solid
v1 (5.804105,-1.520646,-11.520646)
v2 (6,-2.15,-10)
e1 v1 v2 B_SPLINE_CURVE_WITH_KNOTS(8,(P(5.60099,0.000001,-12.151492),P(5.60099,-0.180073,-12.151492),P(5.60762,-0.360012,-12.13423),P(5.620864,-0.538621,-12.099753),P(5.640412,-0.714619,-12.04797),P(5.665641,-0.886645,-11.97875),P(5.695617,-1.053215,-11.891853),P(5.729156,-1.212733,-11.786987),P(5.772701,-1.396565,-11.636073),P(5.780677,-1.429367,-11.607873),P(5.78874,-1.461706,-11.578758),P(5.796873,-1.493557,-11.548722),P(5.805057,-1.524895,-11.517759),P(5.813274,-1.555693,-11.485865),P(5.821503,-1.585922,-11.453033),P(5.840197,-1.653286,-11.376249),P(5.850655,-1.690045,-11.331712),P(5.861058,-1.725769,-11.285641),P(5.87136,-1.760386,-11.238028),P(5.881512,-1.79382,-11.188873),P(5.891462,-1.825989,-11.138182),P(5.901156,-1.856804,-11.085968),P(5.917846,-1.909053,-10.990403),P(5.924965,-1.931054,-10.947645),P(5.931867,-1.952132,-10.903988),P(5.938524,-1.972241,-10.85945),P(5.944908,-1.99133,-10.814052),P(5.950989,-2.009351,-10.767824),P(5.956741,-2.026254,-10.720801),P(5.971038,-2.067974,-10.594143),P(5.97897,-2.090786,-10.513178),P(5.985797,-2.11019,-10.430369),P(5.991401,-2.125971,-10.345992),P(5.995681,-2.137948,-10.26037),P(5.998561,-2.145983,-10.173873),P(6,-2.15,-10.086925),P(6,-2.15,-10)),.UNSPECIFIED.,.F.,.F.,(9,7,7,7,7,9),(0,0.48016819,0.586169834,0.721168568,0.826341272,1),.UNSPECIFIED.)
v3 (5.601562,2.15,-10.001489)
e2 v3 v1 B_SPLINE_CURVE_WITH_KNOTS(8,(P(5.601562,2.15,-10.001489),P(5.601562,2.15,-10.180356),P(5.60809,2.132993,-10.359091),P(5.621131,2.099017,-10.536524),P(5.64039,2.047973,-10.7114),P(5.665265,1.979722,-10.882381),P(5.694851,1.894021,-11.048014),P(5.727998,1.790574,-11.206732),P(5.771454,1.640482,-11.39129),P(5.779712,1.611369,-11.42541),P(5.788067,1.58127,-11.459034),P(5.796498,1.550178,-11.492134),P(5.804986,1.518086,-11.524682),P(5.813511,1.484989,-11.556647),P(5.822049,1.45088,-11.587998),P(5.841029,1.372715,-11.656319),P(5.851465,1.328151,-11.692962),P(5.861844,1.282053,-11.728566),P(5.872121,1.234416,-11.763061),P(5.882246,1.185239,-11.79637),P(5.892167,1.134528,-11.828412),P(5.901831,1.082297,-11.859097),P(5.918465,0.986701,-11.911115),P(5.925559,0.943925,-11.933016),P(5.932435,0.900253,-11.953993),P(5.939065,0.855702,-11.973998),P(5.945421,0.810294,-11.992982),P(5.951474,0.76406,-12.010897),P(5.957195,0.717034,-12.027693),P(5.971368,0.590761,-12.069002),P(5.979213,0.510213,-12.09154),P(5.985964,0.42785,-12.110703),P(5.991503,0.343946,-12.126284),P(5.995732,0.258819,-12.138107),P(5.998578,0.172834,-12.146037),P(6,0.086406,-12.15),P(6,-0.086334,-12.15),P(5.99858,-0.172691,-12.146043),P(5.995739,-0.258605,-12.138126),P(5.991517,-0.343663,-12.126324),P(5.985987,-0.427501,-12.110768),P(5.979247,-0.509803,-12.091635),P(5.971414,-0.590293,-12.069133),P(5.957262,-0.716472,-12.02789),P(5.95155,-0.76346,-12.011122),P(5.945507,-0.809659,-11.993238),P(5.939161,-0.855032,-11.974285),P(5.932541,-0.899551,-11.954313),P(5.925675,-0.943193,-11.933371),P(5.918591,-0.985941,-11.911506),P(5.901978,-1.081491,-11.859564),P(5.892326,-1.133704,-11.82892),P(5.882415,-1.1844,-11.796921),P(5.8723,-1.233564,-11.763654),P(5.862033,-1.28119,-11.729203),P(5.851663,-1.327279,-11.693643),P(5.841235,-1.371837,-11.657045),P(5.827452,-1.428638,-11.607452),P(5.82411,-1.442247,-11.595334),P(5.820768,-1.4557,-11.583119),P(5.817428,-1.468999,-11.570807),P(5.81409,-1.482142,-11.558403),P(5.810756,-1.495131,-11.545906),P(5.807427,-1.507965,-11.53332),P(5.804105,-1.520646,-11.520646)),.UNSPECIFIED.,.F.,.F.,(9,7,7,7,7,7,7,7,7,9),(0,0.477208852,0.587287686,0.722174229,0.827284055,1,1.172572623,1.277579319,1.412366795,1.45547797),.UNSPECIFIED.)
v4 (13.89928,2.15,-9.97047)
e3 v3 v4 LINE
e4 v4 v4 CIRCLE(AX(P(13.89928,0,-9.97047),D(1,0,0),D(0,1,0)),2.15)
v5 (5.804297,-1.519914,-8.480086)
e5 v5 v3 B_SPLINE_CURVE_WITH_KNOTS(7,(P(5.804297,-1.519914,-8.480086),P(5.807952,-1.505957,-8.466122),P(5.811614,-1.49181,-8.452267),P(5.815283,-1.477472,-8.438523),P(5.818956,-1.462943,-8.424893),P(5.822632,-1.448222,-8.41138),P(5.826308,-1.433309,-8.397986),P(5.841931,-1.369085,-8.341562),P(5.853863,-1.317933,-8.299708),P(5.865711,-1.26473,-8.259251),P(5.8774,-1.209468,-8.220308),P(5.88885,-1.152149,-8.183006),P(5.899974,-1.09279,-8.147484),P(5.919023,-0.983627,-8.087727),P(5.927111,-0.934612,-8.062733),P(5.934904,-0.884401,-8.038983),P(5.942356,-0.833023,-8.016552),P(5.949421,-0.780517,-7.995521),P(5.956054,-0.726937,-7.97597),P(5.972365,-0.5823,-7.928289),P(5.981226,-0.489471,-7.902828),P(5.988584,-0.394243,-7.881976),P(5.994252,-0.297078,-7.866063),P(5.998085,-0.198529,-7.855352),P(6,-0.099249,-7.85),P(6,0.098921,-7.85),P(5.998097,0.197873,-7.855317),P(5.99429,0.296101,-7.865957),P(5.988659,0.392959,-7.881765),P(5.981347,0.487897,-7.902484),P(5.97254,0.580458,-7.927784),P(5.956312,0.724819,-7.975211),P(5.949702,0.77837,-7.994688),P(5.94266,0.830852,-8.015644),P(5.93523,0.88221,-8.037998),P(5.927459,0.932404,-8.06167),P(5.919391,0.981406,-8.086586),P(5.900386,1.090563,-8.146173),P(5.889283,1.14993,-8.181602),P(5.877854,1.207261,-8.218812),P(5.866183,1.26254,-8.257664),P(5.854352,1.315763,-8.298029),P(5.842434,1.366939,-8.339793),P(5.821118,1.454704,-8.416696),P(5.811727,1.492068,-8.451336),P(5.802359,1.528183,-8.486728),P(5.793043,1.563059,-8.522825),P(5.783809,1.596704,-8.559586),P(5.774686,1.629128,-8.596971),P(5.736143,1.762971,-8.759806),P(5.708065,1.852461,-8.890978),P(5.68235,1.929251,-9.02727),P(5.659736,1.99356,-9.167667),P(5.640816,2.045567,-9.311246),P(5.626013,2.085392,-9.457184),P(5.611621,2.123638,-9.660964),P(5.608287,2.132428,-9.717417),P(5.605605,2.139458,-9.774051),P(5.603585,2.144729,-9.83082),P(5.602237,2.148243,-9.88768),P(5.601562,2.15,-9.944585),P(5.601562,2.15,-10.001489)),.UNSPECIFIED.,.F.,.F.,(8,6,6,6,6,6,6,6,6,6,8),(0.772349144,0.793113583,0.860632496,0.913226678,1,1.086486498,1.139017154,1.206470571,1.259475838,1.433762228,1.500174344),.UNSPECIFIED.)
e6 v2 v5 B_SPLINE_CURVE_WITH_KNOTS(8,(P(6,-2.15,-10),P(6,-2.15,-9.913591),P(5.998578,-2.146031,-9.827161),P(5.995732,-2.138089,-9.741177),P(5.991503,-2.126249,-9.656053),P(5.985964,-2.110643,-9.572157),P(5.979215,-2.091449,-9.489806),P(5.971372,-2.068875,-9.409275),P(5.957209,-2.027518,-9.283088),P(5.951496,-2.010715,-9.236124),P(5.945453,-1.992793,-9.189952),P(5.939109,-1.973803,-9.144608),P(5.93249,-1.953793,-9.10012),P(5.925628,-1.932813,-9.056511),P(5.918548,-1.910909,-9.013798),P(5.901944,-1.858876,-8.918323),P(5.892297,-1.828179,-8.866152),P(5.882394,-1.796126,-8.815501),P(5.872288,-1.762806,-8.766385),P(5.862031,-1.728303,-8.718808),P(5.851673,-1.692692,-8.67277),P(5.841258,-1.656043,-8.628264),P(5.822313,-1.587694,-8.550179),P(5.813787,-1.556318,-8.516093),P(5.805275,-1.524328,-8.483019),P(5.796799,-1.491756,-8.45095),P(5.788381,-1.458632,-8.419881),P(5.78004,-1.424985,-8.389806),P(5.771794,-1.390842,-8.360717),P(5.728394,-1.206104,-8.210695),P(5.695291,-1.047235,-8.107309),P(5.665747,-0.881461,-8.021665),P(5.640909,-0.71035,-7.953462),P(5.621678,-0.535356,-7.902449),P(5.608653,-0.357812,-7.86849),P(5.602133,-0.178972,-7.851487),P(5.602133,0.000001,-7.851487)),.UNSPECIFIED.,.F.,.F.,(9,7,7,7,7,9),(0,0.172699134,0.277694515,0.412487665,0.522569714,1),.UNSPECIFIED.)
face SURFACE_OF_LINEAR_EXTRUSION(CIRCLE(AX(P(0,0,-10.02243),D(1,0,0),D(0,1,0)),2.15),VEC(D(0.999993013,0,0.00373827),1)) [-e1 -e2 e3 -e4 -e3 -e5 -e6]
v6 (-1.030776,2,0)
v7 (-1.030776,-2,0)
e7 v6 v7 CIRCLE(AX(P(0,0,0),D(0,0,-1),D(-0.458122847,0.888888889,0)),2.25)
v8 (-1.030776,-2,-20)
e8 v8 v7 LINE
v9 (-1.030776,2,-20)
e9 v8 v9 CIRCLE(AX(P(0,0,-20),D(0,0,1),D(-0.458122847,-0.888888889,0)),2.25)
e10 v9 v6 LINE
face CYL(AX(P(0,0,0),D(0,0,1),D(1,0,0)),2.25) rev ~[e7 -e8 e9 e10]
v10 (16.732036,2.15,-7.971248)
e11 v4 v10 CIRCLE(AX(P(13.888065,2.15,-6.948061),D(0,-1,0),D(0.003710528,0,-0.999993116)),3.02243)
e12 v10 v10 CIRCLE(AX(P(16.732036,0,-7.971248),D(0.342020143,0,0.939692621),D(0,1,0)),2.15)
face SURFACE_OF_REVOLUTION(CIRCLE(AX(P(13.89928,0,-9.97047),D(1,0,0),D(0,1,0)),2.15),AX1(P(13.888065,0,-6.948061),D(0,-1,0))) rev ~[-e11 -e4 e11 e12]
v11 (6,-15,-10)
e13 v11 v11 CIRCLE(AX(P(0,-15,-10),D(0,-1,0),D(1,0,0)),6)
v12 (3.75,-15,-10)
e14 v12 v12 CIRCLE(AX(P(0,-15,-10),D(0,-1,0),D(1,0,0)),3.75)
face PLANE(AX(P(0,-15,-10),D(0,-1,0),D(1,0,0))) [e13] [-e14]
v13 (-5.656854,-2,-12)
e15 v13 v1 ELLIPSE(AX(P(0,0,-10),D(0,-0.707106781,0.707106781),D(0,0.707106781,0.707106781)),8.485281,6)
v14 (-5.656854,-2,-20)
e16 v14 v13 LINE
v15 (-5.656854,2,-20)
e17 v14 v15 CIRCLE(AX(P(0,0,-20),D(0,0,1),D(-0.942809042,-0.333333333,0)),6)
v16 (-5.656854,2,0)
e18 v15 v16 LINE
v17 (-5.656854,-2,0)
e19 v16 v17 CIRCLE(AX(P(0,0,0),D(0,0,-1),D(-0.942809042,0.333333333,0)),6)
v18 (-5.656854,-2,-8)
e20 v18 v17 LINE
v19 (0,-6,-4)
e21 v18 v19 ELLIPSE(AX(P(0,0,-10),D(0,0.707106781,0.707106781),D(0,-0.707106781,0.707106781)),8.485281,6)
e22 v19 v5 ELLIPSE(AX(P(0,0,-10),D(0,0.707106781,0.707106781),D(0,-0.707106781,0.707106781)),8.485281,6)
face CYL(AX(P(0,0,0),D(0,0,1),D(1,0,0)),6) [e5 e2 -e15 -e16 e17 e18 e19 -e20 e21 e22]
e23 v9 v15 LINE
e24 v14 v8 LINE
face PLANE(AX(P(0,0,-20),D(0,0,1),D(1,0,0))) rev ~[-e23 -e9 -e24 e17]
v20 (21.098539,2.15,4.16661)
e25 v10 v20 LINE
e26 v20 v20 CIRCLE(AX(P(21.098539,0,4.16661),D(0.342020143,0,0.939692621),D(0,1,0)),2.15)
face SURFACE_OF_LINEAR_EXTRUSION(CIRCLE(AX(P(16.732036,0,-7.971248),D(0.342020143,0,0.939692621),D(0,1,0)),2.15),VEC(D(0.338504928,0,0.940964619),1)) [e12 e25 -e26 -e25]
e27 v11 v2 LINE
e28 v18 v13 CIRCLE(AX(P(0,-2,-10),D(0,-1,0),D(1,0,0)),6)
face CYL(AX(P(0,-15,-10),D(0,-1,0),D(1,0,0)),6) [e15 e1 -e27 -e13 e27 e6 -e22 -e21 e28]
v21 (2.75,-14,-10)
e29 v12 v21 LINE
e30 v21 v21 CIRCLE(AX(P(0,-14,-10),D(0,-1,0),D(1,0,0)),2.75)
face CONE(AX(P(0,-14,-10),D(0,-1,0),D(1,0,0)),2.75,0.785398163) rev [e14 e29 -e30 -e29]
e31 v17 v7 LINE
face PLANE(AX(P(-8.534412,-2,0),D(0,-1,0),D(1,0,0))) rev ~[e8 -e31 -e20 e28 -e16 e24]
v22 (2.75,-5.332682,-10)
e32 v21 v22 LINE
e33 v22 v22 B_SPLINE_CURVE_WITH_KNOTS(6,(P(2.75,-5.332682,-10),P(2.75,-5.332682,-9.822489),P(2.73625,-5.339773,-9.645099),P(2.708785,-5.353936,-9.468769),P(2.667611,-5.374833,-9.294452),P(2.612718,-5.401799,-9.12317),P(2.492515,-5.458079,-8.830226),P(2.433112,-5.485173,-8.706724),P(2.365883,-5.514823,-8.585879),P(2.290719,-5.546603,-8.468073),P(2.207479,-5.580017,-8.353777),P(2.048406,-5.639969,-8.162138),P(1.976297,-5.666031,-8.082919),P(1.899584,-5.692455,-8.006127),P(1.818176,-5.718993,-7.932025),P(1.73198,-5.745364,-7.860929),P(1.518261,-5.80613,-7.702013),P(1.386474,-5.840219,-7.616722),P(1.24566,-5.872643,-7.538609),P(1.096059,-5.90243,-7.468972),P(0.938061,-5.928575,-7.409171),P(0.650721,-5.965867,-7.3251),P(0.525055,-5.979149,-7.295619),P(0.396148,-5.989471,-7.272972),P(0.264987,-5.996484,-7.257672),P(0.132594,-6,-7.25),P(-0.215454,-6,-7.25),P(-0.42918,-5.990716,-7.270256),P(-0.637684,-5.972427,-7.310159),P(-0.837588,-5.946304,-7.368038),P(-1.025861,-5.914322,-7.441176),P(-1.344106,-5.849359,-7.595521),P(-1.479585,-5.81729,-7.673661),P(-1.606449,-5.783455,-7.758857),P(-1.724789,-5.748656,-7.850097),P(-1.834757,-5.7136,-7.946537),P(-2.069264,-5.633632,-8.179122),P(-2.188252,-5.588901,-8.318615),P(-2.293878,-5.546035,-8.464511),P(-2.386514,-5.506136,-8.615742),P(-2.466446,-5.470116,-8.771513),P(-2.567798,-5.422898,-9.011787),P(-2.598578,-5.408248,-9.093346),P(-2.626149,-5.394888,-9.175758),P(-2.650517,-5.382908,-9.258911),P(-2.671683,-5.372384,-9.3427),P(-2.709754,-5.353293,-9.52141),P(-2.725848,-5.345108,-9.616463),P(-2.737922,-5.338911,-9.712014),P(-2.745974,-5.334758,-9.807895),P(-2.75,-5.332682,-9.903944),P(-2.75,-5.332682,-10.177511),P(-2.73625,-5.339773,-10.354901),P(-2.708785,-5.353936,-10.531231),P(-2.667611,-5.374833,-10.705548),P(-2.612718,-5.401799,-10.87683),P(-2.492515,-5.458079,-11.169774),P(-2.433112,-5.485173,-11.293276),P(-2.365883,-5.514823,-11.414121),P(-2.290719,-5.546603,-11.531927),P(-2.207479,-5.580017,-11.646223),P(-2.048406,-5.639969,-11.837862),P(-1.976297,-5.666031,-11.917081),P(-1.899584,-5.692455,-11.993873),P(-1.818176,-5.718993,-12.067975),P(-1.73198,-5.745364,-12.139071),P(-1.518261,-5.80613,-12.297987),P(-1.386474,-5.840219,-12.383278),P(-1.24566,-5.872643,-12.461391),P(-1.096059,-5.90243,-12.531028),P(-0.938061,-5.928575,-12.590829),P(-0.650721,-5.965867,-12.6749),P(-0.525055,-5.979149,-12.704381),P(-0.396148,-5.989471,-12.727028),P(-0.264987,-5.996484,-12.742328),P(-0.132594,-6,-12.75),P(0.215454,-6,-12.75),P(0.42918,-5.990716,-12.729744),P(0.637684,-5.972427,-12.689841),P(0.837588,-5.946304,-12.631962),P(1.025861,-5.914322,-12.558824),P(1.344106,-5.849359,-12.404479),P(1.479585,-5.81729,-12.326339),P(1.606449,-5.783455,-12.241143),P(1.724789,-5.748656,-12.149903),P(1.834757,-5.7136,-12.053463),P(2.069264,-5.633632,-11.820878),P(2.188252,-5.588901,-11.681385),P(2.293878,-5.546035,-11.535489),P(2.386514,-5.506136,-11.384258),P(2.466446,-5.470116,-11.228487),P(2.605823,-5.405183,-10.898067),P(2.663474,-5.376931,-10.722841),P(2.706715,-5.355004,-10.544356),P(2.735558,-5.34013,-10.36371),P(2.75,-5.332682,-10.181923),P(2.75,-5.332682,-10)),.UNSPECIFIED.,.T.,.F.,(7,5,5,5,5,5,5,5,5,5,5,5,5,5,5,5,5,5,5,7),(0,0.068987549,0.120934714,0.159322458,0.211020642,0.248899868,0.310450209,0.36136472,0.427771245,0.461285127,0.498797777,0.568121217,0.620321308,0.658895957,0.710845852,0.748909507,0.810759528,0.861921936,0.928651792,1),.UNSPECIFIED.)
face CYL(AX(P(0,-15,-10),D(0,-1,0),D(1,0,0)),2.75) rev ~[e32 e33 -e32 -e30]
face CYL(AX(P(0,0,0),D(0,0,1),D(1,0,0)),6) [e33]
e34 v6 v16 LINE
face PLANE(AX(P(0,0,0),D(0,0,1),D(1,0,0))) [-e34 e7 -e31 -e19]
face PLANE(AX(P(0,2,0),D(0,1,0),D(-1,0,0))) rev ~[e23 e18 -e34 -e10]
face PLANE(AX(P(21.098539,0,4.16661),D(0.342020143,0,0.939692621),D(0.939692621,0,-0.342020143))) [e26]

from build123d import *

# Parameters (mm, degrees)
F0_R      = 6
F1_DEPTH  = 20
F4_R      = 6
F4_R_2    = 2.75
F5_DEPTH  = 15
F7_DEPTH  = 20
F8_SIZE   = 1
F11_R     = 2.15
F2_R      = 2.25
F13_DEPTH = 20.0010001


# Not quite as in the source:
# - a feature of the source that left no trace in its solid (it failed there, or was rolled back) is left out


with BuildPart() as f1:
    # F0 (on Top) → F1 (new body)
    with BuildSketch(Plane.XY):
        Circle(F0_R)
    extrude(amount=-F1_DEPTH)

    # F4 (on offset) → F5 (join)
    with BuildSketch(Plane.XZ.offset(15)):
        with Locations((0, -10)):
            Circle(F4_R)
        with Locations((0, -10)):
            Circle(F4_R_2, mode=Mode.SUBTRACT)
    extrude(amount=-F5_DEPTH)

    # F6 (on face) → F7 (cut, through all)
    with BuildSketch(Plane.XY):
        with BuildLine():
            Line((0, 2), (-5.6568542495, 2))
            ThreePointArc((-5.6568542495, 2), (-6, 0), (-5.6568542495, -2))
            Line((-5.6568542495, -2), (0, -2))
            Line((0, -2), (0, 2))
        make_face()
        with BuildLine():
            Line((-5.6568542495, 2), (-8.5344118631, 2))
            Line((-8.5344118631, 2), (-8.5344118631, -2))
            Line((-8.5344118631, -2), (-5.6568542495, -2))
            ThreePointArc((-5.6568542495, -2), (-6, 0), (-5.6568542495, 2))
        make_face()
    extrude(amount=-F7_DEPTH, mode=Mode.SUBTRACT)

    # F8
    f8_edges = [f1.edges().sort_by_distance(p)[0] for p in [
        (-2.75, -15, -10),
    ]]
    chamfer(f8_edges, length=F8_SIZE)

    # F12: sweep along a path in F10
    with BuildLine(Plane.XZ) as f12_path:
        Line((0, -10), (13.8992802655, -9.9480403702))
        ThreePointArc((13.8992802655, -9.9480403702), (15.6179693755, -9.3990677428), (16.7109593102, -7.9635761178))
        Line((16.7109593102, -7.9635761178), (21.0774621296, 4.1742816034))
    # F11 (on offset) → F12 (sweep)
    with BuildSketch(Plane.YZ.offset(6)):
        with Locations((0, -10)):
            Circle(F11_R)
    sweep(path=f12_path.line)

    # F2 (on face) → F13 (cut, through all)
    with BuildSketch(Plane.XY):
        Circle(F2_R)
    extrude(amount=-F13_DEPTH, mode=Mode.SUBTRACT)


solid = f1.part
